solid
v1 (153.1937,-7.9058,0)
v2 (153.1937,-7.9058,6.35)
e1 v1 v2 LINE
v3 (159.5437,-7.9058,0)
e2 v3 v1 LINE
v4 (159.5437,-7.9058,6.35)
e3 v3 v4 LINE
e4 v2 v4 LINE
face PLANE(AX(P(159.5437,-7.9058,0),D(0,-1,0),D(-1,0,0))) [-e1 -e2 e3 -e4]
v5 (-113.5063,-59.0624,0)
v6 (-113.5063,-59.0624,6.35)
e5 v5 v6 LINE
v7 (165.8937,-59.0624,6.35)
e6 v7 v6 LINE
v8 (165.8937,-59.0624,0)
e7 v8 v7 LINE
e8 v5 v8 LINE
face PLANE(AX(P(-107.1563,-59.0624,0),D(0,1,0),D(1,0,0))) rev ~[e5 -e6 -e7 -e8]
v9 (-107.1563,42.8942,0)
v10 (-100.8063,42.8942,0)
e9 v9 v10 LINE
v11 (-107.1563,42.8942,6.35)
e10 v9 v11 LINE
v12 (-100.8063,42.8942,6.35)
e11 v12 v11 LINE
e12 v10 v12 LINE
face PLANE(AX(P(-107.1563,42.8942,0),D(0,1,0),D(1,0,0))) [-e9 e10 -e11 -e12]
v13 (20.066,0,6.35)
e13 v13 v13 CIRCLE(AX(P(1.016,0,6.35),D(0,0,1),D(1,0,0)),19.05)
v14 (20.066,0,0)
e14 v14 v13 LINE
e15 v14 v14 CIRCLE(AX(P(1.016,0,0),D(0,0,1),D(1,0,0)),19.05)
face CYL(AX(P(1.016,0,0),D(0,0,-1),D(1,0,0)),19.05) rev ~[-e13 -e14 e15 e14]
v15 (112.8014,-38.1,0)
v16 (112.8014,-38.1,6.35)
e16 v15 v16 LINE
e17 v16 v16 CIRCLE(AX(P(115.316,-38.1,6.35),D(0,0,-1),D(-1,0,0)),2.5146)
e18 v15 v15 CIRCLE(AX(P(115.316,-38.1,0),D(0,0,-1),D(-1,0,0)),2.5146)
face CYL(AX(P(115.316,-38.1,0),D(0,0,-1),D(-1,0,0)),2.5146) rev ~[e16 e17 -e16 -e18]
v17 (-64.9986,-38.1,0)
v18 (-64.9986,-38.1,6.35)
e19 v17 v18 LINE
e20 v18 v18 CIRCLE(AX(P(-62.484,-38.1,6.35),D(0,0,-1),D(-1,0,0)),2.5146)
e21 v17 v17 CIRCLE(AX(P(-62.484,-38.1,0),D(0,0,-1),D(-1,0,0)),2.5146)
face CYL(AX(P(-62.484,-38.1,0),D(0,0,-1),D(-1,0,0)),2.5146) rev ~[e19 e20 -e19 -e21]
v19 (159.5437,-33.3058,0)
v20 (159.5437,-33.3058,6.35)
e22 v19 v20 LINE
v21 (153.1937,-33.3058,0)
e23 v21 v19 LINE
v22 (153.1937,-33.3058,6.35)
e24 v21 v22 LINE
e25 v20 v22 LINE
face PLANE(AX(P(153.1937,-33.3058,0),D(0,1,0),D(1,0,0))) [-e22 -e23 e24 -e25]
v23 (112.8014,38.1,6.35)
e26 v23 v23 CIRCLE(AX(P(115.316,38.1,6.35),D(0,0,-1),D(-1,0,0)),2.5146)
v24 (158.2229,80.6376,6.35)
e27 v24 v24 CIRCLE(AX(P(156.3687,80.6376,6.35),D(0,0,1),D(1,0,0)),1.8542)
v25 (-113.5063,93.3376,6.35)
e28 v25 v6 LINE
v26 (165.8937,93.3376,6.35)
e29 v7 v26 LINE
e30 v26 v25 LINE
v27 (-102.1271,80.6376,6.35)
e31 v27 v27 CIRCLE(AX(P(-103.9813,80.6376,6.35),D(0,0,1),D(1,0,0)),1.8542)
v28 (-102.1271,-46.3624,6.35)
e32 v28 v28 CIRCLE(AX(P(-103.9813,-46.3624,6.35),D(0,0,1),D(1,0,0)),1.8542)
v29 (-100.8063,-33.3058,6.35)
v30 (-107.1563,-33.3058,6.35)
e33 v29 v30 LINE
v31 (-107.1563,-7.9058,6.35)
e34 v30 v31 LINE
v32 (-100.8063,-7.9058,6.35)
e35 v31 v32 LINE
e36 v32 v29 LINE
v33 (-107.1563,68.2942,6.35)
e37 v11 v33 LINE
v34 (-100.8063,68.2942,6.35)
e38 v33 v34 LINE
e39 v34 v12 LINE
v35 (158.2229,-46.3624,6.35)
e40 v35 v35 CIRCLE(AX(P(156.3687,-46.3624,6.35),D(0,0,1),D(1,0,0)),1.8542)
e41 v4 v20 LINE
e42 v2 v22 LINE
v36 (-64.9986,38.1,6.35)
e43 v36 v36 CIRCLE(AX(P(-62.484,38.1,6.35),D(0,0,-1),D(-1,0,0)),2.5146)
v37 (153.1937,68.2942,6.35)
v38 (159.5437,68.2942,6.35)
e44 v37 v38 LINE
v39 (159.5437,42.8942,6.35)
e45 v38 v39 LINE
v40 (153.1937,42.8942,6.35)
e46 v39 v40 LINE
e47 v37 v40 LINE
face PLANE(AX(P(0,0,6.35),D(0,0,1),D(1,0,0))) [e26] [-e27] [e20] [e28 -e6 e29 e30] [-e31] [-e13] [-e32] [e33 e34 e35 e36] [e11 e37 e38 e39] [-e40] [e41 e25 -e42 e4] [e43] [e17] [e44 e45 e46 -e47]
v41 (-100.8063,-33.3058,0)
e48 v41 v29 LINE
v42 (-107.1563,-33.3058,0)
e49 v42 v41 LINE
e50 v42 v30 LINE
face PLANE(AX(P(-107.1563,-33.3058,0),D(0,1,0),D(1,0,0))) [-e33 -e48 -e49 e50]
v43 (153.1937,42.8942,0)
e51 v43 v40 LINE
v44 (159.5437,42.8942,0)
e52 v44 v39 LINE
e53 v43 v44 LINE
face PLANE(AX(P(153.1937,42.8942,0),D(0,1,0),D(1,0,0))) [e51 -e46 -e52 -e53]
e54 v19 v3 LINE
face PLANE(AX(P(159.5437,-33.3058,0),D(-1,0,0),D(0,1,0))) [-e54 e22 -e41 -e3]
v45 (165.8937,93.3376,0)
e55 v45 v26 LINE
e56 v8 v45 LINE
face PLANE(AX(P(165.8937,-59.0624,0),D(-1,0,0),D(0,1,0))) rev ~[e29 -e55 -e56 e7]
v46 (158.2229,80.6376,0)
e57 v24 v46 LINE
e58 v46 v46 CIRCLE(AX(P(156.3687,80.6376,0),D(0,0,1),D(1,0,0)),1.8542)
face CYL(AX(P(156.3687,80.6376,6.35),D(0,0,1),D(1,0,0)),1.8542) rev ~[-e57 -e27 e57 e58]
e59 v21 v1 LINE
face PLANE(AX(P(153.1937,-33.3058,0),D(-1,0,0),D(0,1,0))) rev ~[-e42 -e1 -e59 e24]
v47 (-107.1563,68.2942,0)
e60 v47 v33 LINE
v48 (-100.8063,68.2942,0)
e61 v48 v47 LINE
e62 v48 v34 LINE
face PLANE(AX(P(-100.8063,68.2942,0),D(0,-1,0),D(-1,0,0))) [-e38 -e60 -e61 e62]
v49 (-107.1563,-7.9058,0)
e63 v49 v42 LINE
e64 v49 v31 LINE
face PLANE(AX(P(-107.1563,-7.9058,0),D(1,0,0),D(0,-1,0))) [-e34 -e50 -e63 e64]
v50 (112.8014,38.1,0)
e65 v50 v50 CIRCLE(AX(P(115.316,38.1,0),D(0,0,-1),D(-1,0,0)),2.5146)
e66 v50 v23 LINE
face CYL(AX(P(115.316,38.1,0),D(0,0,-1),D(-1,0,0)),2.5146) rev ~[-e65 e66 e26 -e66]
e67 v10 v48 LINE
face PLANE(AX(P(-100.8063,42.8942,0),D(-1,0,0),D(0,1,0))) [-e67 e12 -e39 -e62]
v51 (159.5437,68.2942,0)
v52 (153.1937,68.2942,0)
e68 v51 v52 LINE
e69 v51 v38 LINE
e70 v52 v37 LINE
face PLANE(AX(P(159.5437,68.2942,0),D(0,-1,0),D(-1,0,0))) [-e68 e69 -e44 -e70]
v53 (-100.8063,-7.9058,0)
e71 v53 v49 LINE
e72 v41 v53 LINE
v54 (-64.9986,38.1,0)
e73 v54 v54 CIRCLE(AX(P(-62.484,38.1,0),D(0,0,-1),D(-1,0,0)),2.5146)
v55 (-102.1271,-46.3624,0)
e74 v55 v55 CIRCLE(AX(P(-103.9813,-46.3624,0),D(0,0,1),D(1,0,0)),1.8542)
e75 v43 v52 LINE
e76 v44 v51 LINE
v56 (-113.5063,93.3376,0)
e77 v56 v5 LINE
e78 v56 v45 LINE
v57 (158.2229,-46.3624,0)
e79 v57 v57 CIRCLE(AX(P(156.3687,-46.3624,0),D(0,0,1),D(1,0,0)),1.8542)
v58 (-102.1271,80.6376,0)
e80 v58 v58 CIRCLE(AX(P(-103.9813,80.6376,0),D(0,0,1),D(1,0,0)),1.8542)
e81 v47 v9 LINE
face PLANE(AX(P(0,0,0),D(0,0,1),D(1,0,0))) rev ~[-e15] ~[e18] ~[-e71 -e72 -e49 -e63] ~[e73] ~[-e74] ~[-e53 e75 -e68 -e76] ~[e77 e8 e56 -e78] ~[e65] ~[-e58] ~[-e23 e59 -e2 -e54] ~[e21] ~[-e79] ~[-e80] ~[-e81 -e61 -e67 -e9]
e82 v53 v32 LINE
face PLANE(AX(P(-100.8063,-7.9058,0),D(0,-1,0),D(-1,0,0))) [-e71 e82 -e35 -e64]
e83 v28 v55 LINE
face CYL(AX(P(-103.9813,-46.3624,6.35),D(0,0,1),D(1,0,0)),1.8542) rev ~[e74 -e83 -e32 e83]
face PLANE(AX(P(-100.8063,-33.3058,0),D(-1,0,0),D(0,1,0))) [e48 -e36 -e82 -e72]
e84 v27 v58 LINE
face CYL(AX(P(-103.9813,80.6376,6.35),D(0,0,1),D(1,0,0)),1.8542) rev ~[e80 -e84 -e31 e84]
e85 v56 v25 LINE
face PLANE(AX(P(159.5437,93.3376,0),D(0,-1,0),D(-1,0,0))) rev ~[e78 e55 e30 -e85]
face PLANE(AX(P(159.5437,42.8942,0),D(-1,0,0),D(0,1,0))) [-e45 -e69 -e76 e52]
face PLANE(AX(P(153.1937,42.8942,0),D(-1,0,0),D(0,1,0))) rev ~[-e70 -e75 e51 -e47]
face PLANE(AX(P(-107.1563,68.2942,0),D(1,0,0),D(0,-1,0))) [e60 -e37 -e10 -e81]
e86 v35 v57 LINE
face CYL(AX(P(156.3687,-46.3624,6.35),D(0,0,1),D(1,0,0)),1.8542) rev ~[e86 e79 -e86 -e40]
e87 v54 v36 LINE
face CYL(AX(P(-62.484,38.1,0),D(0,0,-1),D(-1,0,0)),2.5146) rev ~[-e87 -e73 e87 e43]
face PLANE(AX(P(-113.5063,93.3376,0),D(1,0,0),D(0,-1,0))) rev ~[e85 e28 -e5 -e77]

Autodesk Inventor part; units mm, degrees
ref_plane "YZ Plane" through (0, 0, 0) normal (1, 0, 0) x (0, 1, 0)
ref_plane "XZ Plane" through (0, 0, 0) normal (0, 1, 0) x (-1, 0, 0)
ref_plane "XY Plane" through (0, 0, 0) normal (0, 0, 1) x (1, 0, 0)
sketch "Sketch1" plane through (0, 0, 0) normal (0, 0, 1) x (1, 0, 0)
  circle A0 centre (1.016, 0) radius 19.05
  line L0 (159.5437, -28.575) -> (159.5437, 29.0493) projected
  line L1 (145.8277, 86.9876) -> (-55.3403, 86.9876) projected
  line L2 (159.5437, 93.3376) -> (-107.1563, 93.3376)
  line L3 (-107.1563, 93.3376) -> (-107.1563, -59.0624)
  line L4 (-107.1563, -59.0624) -> (159.5437, -59.0624)
  line L5 (159.5437, -59.0624) -> (159.5437, 93.3376)
  point P0 (0, 0)
  dimension "d0" = 266.7
  dimension "d1" = 152.4
  dimension "d15" = 38.1
extrude "Extrusion1" add sketch "Sketch1" along normal blind 6.35
sketch "Sketch2" plane through (0, 0, 6.35) normal (0, 0, 1) x (1, 0, 0)
  line L0 (-107.1563, 93.3376) -> (159.5437, 93.3376) projected
  line L1 (-107.1563, -59.0624) -> (-107.1563, 93.3376) projected
  line L2 (-103.9813, 93.3376) -> (-103.9813, -59.0624) construction
  circle A0 centre (-103.9813, 80.6376) radius 1.8542
  dimension "d4" = 3.175
  dimension "d5" = 3.7084
  dimension "d6" = 12.7
extrude "Extrusion2" cut sketch "Sketch2" against normal through all
pattern_linear "Rectangular Pattern1" count 2 spacing 127 along (0, -1, 0) count 2 spacing 260.35 along (1, 0, 0) of "Extrusion2"
sketch "Sketch3" plane through (0, 0, 0) normal (0, 0, -1) x (-1, 0, 0)
  circle A0 centre (62.484, 38.1) radius 2.5146 projected
  circle A1 centre (62.484, -38.1) radius 2.5146 projected
  circle A2 centre (-115.316, -38.1) radius 2.5146 projected
  circle A3 centre (-115.316, 38.1) radius 2.5146 projected
  point P0 (0, 0)
extrude "Extrusion3" cut sketch "Sketch3" against normal through all
sketch "Sketch4" plane through (0, 0, 0) normal (0, 0, -1) x (-1, 0, 0)
  line L0 (107.1563, 93.3376) -> (113.5063, 93.3376)
  line L1 (113.5063, 93.3376) -> (113.5063, -59.0624)
  line L2 (113.5063, -59.0624) -> (107.1563, -59.0624)
  line L3 (107.1563, -59.0624) -> (107.1563, 93.3376)
  line L4 (-159.5437, -59.0624) -> (-165.8937, -59.0624)
  line L5 (-165.8937, -59.0624) -> (-165.8937, 93.3376)
  line L6 (-165.8937, 93.3376) -> (-159.5437, 93.3376)
  line L7 (-159.5437, 93.3376) -> (-159.5437, -59.0624)
  point P0 (0, 0)
  dimension "d18" = 6.35
  dimension "d19" = 6.35
extrude "Extrusion4" add sketch "Sketch4" against normal blind 6.35
sketch "Sketch5" plane through (0, 0, 0) normal (0, 0, -1) x (-1, 0, 0)
  line L0 (-159.5437, -59.0624) -> (-159.5437, 93.3376) projected
  line L1 (-159.5437, 93.3376) -> (-153.1937, 93.3376) projected
  line L2 (-153.1937, -59.0624) -> (-153.1937, 93.3376) projected
  line L3 (-159.5437, -59.0624) -> (-153.1937, -59.0624) projected
  line L4 (-159.5437, 68.2942) -> (-153.1937, 68.2942)
  line L5 (-153.1937, 68.2942) -> (-153.1937, 42.8942)
  line L6 (-153.1937, 42.8942) -> (-159.5437, 42.8942)
  line L7 (-159.5437, 42.8942) -> (-159.5437, 68.2942)
  line L8 (-159.5437, -7.9058) -> (-153.1937, -7.9058)
  line L9 (-153.1937, -7.9058) -> (-153.1937, -33.3058)
  line L10 (-153.1937, -33.3058) -> (-159.5437, -33.3058)
  line L11 (-159.5437, -33.3058) -> (-159.5437, -7.9058)
  line L12 (100.8063, 68.2942) -> (107.1563, 68.2942)
  line L13 (107.1563, 68.2942) -> (107.1563, 42.8942)
  line L14 (107.1563, 42.8942) -> (100.8063, 42.8942)
  line L15 (100.8063, 42.8942) -> (100.8063, 68.2942)
  line L16 (100.8063, -7.9058) -> (107.1563, -7.9058)
  line L17 (107.1563, -7.9058) -> (107.1563, -33.3058)
  line L18 (107.1563, -33.3058) -> (100.8063, -33.3058)
  line L19 (100.8063, -33.3058) -> (100.8063, -7.9058)
  point P0 (0, 0)
  dimension "d22" = 25.4
  dimension "d25" = 76.2
  dimension "d28" = 260.35
extrude "Extrusion5" cut sketch "Sketch5" against normal through all contours L0 L8 L2 L10 | L0 L4 L2 L6 | L12 L13 L14 L15 | L16 L17 L18 L19
properties part number "panStepperMountRB01" material "Wood (Oak)"
